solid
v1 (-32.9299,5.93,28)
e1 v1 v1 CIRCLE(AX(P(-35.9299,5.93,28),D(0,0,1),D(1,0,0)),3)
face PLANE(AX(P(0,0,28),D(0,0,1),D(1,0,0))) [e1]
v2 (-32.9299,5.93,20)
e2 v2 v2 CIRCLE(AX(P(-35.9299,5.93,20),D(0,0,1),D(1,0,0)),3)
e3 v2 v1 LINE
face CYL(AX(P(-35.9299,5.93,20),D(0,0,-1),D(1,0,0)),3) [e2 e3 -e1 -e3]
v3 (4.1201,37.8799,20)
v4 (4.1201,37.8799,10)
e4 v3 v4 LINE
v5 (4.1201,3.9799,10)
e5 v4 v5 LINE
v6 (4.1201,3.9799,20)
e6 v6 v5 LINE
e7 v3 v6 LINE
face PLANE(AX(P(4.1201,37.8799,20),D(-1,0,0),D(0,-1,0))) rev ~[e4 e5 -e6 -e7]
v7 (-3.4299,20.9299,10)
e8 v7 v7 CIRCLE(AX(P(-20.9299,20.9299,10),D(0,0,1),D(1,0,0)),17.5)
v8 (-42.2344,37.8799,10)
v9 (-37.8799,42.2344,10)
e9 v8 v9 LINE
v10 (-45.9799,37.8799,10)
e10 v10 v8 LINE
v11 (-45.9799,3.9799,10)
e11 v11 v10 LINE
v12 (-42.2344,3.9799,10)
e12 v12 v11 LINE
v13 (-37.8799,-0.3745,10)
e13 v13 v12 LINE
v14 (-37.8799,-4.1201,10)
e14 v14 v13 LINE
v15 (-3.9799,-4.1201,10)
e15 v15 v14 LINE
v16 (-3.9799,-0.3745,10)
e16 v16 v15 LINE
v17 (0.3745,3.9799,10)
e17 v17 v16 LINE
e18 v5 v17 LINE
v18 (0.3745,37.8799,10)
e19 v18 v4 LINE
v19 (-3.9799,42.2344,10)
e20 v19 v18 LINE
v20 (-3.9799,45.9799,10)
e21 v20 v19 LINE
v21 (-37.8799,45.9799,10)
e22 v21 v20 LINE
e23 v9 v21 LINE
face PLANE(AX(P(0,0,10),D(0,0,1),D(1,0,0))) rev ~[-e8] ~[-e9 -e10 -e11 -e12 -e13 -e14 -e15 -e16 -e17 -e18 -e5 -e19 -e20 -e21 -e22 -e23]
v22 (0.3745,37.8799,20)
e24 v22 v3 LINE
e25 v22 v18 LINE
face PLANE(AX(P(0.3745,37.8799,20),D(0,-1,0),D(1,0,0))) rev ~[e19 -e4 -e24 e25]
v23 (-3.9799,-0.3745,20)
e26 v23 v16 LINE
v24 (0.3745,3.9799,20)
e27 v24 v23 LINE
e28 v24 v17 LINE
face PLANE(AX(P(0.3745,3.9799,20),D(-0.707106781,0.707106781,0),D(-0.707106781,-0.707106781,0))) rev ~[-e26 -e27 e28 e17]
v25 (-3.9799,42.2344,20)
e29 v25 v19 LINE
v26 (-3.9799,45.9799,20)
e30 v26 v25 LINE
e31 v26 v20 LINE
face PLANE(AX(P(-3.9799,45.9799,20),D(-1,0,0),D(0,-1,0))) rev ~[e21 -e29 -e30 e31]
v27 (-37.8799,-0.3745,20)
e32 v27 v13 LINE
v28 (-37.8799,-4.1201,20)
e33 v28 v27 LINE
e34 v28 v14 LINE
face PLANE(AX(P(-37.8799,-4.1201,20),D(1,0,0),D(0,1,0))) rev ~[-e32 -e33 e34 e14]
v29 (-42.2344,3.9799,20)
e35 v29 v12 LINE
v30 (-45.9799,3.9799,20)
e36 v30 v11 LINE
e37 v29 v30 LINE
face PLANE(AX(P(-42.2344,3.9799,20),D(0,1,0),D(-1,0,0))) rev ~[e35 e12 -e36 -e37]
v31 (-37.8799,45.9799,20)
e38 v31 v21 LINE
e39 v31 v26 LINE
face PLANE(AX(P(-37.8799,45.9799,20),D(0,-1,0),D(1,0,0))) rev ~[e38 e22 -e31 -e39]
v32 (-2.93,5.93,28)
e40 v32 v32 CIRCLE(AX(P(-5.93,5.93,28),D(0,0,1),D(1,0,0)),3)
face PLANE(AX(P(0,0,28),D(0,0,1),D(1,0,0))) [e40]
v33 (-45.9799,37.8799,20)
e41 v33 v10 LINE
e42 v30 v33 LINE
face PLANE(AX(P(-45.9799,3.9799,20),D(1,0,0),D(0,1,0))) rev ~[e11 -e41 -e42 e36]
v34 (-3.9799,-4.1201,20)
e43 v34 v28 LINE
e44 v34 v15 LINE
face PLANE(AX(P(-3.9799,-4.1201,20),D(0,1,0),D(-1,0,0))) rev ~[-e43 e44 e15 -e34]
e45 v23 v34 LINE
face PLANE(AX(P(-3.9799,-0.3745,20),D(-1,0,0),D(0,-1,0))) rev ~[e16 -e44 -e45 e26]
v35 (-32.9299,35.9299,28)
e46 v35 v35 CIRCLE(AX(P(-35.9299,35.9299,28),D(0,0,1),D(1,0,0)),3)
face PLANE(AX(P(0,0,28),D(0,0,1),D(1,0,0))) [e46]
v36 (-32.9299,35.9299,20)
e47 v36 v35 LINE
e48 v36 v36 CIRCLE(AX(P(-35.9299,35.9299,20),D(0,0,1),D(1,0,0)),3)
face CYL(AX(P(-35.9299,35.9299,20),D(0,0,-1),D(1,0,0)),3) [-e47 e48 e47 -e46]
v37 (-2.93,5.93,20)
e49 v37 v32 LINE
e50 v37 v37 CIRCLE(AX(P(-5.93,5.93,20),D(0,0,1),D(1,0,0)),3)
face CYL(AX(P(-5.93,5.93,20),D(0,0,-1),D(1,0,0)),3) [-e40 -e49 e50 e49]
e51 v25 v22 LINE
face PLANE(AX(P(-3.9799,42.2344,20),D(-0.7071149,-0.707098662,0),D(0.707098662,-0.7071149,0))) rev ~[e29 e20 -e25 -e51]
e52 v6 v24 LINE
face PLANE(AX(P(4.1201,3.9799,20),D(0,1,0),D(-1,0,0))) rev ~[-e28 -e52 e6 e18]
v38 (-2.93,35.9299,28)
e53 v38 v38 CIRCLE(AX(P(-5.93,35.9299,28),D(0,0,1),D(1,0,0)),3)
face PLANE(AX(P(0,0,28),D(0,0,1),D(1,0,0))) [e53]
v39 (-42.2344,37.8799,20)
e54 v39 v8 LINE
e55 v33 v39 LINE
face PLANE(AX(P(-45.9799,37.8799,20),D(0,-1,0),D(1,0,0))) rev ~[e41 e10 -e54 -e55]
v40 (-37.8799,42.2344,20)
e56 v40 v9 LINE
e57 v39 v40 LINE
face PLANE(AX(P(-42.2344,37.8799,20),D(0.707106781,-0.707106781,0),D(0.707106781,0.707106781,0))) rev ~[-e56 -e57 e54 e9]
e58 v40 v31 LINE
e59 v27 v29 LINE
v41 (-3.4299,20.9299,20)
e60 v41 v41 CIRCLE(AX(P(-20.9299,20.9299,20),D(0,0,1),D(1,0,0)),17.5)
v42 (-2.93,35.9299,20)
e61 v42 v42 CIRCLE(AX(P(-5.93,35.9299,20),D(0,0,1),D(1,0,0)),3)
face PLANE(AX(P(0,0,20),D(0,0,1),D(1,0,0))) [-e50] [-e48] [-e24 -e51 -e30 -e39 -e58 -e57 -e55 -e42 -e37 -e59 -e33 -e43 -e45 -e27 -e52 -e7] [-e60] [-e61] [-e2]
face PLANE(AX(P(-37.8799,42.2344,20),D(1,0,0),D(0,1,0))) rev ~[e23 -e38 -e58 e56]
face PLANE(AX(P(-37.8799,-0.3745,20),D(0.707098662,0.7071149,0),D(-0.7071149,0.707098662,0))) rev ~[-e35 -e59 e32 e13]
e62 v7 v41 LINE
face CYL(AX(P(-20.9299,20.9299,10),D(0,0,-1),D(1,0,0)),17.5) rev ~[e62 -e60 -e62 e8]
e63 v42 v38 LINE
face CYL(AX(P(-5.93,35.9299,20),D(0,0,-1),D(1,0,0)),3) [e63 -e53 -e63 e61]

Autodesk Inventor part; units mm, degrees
ref_plane "YZ Plane" through (0, 0, 0) normal (1, 0, 0) x (0, 1, 0)
ref_plane "XZ Plane" through (0, 0, 0) normal (0, 1, 0) x (-1, 0, 0)
ref_plane "Work Plane1" through (0, 0, 10) normal (0, 0, 1) x (1, 0, 0)
sketch "Sketch1" plane through (0, 0, 10) normal (0, 0, 1) x (1, 0, 0)
  line L0 (-4.0299, -0.3538) -> (-2.2322, 1.4439) construction
  arc A0 (-1.4439, 2.2322) -> (-2.2322, 1.4439) centre (-0.9299, 0.9299) ccw construction
  line L1 (-1.4439, 2.2322) -> (0.3538, 4.0299) construction
  line L2 (-37.8299, 42.8299) -> (-37.8299, 37.8299) construction
  line L3 (-37.8299, 37.8299) -> (-42.9208, 37.8299) construction
  line L4 (-37.8299, 42.2137) -> (-37.8299, 45.8299) construction
  line L5 (-37.8299, 45.8299) -> (-4.0299, 45.8299) construction
  line L6 (-4.0299, 45.8299) -> (-4.0299, 42.2137) construction
  line L7 (-4.0299, 4.0299) -> (0.3538, 4.0299) projected
  circle A1 centre (-20.9299, 20.9299) radius 17.5 projected
  line L8 (-20.9299, 58.9723) -> (17.1124, 20.9299) construction
  line L9 (17.1124, 20.9299) -> (-20.9299, -17.1124) construction
  line L10 (-20.9299, -17.1124) -> (-58.9723, 20.9299) construction
  line L11 (-58.9723, 20.9299) -> (-20.9299, 58.9723) construction
  line L12 (-20.9299, 58.9723) -> (-20.9299, -17.1124) construction
  line L13 (17.1124, 20.9299) -> (-58.9723, 20.9299) construction
  line L14 (-20.9299, 58.9723) -> (32.8701, 58.9723) construction
  line L15 (-43.4299, 43.4299) -> (1.5701, 43.4299) construction
  line L16 (1.5701, 43.4299) -> (1.5701, -1.5701) construction
  line L17 (1.5701, -1.5701) -> (-43.4299, -1.5701) construction
  line L18 (-43.4299, -1.5701) -> (-43.4299, 43.4299) construction
  line L19 (-43.4299, 43.4299) -> (1.5701, -1.5701) construction
  line L20 (1.5701, 43.4299) -> (-43.4299, -1.5701) construction
  line L21 (-43.4299, 5.3876) -> (-43.4299, 36.4723)
  line L22 (-43.4299, 36.4723) -> (-36.4723, 43.4299)
  line L23 (-36.4723, 43.4299) -> (-5.3876, 43.4299)
  line L24 (-5.3876, 43.4299) -> (1.5701, 36.4723)
  line L25 (1.5701, 36.4723) -> (1.5701, 5.3876)
  line L26 (1.5701, 5.3876) -> (-5.3876, -1.5701)
  line L27 (-5.3876, -1.5701) -> (-36.4723, -1.5701)
  line L28 (-36.4723, -1.5701) -> (-43.4299, 5.3876)
  line L29 (-4.0299, 42.2137) -> (-37.8299, 42.2137) projected
  line L30 (-4.0299, -0.3538) -> (-4.0299, 4.0299) projected
  point P0 (-37.8299, 4.0299)
  point P1 (-20.9299, 20.9299)
  dimension "d18" = 53.8
  dimension "d19" = 45
  dimension "d20" = 53.8
  dimension "d21" = 45
  dimension "d22" = 45
extrude "Extrusion1" add sketch "Sketch1" along normal blind 10
sketch "Sketch2" plane through (0, 0, 20) normal (0, 0, 1) x (1, 0, 0)
  circle A0 centre (-35.9299, 35.9299) radius 3.0099 construction
  circle A1 centre (-5.93, 35.9299) radius 3.0099 construction
  circle A2 centre (-5.93, 5.93) radius 3.0099 construction
  circle A3 centre (-35.9299, 5.93) radius 3.0099 construction
  circle A4 centre (-35.9299, 35.9299) radius 3
  circle A5 centre (-5.93, 35.9299) radius 3
  circle A6 centre (-5.93, 5.93) radius 3
  circle A7 centre (-35.9299, 5.93) radius 3
  point P0 (0, 0)
  dimension "d1" = 6
  dimension "d31" = 6
  dimension "d32" = 6
  dimension "d33" = 6
ref_plane "Work Plane2" through (-40.9959, 0.8639, 22.2359) normal (0, 0, 1) x (1, 0, 0)
extrude "Extrusion2" add sketch "Sketch2" along normal blind 8
sketch "Sketch3" plane through (0, 0, 10) normal (0, 0, -1) x (-1, 0, 0)
  line L0 (37.8299, -0.4701) -> (37.8299, 4.0299) construction
  line L1 (4.0299, 4.0299) -> (4.0299, -0.4701) construction
  line L2 (37.8299, -0.4701) -> (37.8299, 1.1886) construction
  line L3 (4.0299, -3.9701) -> (4.0299, -0.3538) construction
  line L4 (45.8299, 4.0299) -> (42.2137, 4.0299) construction
  line L5 (-0.3538, 4.0299) -> (-3.9701, 4.0299) construction
  line L6 (-3.9701, 37.8299) -> (-0.3538, 37.8299) construction
  line L7 (4.0299, 42.2137) -> (4.0299, 45.8299) construction
  line L8 (37.8299, 45.8299) -> (37.8299, 42.2137) construction
  line L9 (42.2137, 37.8299) -> (45.8299, 37.8299) construction
  line L10 (40.4657, 37.7299) -> (45.8299, 37.7299)
  line L11 (45.8299, 37.7299) -> (45.8299, 4.1299)
  line L12 (45.8299, 4.1299) -> (40.4657, 4.1299)
  line L13 (40.4657, 4.1299) -> (40.4657, 37.7299)
  line L14 (37.7299, 2.4952) -> (4.1299, 2.4952)
  line L15 (4.1299, 2.4952) -> (4.1299, -3.9701)
  line L16 (4.1299, -3.9701) -> (37.7299, -3.9701)
  line L17 (37.7299, -3.9701) -> (37.7299, 2.4952)
  line L18 (1.8946, 4.1299) -> (-3.9701, 4.1299)
  line L19 (-3.9701, 4.1299) -> (-3.9701, 37.7299)
  line L20 (-3.9701, 37.7299) -> (1.8946, 37.7299)
  line L21 (1.8946, 37.7299) -> (1.8946, 4.1299)
  line L22 (4.1299, 40.7326) -> (37.7299, 40.7326)
  line L23 (37.7299, 40.7326) -> (37.7299, 45.8299)
  line L24 (37.7299, 45.8299) -> (4.1299, 45.8299)
  line L25 (4.1299, 45.8299) -> (4.1299, 40.7326)
  point P0 (0, 0)
  dimension "d23" = 0.1
  dimension "d24" = 0.1
  dimension "d25" = 0.1
  dimension "d26" = 0.1
  dimension "d27" = 0.1
extrude "Extrusion3" add sketch "Sketch3" against normal up to surface (10 mm away)
sketch "Sketch4" plane through (0, 0, 20) normal (0, 0, 1) x (1, 0, 0)
  line L0 (3.9701, 4.1299) -> (0.3124, 4.1299) projected
  line L1 (3.9701, 37.7299) -> (3.9701, 4.1299) projected
  line L2 (0.3124, 37.7299) -> (3.9701, 37.7299) projected
  line L3 (0.3124, 37.7299) -> (-4.1299, 42.1723) projected
  line L4 (-4.1299, 45.8299) -> (-4.1299, 42.1723) projected
  line L5 (-37.7299, 45.8299) -> (-4.1299, 45.8299) projected
  line L6 (-37.7299, 42.1723) -> (-37.7299, 45.8299) projected
  line L7 (-37.7299, 42.1723) -> (-42.1723, 37.7299) projected
  line L8 (-45.8299, 37.7299) -> (-42.1723, 37.7299) projected
  line L9 (-45.8299, 4.1299) -> (-45.8299, 37.7299) projected
  line L10 (-42.1723, 4.1299) -> (-45.8299, 4.1299) projected
  line L11 (-42.1723, 4.1299) -> (-37.7299, -0.3124) projected
  line L12 (-37.7299, -3.9701) -> (-37.7299, -0.3124) projected
  line L13 (-4.1299, -3.9701) -> (-37.7299, -3.9701) projected
  line L14 (-4.1299, -0.3124) -> (-4.1299, -3.9701) projected
  line L15 (-4.1299, -0.3124) -> (0.3124, 4.1299) projected
  circle A0 centre (-20.9299, 20.9299) radius 17.5 projected
  circle A1 centre (-35.9299, 5.93) radius 3 projected
  circle A2 centre (-5.93, 35.9299) radius 3 projected
  circle A3 centre (-35.9299, 35.9299) radius 3 projected
  circle A4 centre (-5.93, 5.93) radius 3 projected
  line L16 (-3.9799, 45.9799) -> (-3.9799, 42.2344)
  line L17 (-3.9799, 42.2344) -> (0.3745, 37.8799)
  line L18 (0.3745, 37.8799) -> (4.1201, 37.8799)
  line L19 (4.1201, 37.8799) -> (4.1201, 3.9799)
  line L20 (4.1201, 3.9799) -> (0.3745, 3.9799)
  line L21 (0.3745, 3.9799) -> (-3.9799, -0.3745)
  line L22 (-3.9799, -0.3745) -> (-3.9799, -4.1201)
  line L23 (-3.9799, -4.1201) -> (-37.8799, -4.1201)
  line L24 (-37.8799, -4.1201) -> (-37.8799, -0.3745)
  line L25 (-37.8799, -0.3745) -> (-42.2344, 3.9799)
  line L26 (-42.2344, 3.9799) -> (-45.9799, 3.9799)
  line L27 (-45.9799, 3.9799) -> (-45.9799, 37.8799)
  line L28 (-45.9799, 37.8799) -> (-42.2344, 37.8799)
  line L29 (-42.2344, 37.8799) -> (-37.8799, 42.2344)
  line L30 (-37.8799, 42.2344) -> (-37.8799, 45.9799)
  line L31 (-37.8799, 45.9799) -> (-3.9799, 45.9799)
  point P0 (0, 0)
  dimension "d34" = 0.15
extrude "Extrusion4" add sketch "Sketch4" against normal up to surface (10 mm away) contours L16 L17 L18 L19 L20 L21 L22 L23 L24 L25 L26 L27 L28 L29 L30 L31
ref_plane "Arbeitsebene3" through (-37.8799, 20.9299, 20) normal (0, -1, 0) x (1, 0, 0)
ref_plane "Arbeitsebene4" through (-20.9299, 3.9799, 20) normal (1, 0, 0) x (0, 0, -1)
equation "\"d31\" = d1"
equation "\"d32\" = d1"
equation "\"d33\" = d1"
properties part number "20_Cube_Insert_Thorlabs_Pins"
